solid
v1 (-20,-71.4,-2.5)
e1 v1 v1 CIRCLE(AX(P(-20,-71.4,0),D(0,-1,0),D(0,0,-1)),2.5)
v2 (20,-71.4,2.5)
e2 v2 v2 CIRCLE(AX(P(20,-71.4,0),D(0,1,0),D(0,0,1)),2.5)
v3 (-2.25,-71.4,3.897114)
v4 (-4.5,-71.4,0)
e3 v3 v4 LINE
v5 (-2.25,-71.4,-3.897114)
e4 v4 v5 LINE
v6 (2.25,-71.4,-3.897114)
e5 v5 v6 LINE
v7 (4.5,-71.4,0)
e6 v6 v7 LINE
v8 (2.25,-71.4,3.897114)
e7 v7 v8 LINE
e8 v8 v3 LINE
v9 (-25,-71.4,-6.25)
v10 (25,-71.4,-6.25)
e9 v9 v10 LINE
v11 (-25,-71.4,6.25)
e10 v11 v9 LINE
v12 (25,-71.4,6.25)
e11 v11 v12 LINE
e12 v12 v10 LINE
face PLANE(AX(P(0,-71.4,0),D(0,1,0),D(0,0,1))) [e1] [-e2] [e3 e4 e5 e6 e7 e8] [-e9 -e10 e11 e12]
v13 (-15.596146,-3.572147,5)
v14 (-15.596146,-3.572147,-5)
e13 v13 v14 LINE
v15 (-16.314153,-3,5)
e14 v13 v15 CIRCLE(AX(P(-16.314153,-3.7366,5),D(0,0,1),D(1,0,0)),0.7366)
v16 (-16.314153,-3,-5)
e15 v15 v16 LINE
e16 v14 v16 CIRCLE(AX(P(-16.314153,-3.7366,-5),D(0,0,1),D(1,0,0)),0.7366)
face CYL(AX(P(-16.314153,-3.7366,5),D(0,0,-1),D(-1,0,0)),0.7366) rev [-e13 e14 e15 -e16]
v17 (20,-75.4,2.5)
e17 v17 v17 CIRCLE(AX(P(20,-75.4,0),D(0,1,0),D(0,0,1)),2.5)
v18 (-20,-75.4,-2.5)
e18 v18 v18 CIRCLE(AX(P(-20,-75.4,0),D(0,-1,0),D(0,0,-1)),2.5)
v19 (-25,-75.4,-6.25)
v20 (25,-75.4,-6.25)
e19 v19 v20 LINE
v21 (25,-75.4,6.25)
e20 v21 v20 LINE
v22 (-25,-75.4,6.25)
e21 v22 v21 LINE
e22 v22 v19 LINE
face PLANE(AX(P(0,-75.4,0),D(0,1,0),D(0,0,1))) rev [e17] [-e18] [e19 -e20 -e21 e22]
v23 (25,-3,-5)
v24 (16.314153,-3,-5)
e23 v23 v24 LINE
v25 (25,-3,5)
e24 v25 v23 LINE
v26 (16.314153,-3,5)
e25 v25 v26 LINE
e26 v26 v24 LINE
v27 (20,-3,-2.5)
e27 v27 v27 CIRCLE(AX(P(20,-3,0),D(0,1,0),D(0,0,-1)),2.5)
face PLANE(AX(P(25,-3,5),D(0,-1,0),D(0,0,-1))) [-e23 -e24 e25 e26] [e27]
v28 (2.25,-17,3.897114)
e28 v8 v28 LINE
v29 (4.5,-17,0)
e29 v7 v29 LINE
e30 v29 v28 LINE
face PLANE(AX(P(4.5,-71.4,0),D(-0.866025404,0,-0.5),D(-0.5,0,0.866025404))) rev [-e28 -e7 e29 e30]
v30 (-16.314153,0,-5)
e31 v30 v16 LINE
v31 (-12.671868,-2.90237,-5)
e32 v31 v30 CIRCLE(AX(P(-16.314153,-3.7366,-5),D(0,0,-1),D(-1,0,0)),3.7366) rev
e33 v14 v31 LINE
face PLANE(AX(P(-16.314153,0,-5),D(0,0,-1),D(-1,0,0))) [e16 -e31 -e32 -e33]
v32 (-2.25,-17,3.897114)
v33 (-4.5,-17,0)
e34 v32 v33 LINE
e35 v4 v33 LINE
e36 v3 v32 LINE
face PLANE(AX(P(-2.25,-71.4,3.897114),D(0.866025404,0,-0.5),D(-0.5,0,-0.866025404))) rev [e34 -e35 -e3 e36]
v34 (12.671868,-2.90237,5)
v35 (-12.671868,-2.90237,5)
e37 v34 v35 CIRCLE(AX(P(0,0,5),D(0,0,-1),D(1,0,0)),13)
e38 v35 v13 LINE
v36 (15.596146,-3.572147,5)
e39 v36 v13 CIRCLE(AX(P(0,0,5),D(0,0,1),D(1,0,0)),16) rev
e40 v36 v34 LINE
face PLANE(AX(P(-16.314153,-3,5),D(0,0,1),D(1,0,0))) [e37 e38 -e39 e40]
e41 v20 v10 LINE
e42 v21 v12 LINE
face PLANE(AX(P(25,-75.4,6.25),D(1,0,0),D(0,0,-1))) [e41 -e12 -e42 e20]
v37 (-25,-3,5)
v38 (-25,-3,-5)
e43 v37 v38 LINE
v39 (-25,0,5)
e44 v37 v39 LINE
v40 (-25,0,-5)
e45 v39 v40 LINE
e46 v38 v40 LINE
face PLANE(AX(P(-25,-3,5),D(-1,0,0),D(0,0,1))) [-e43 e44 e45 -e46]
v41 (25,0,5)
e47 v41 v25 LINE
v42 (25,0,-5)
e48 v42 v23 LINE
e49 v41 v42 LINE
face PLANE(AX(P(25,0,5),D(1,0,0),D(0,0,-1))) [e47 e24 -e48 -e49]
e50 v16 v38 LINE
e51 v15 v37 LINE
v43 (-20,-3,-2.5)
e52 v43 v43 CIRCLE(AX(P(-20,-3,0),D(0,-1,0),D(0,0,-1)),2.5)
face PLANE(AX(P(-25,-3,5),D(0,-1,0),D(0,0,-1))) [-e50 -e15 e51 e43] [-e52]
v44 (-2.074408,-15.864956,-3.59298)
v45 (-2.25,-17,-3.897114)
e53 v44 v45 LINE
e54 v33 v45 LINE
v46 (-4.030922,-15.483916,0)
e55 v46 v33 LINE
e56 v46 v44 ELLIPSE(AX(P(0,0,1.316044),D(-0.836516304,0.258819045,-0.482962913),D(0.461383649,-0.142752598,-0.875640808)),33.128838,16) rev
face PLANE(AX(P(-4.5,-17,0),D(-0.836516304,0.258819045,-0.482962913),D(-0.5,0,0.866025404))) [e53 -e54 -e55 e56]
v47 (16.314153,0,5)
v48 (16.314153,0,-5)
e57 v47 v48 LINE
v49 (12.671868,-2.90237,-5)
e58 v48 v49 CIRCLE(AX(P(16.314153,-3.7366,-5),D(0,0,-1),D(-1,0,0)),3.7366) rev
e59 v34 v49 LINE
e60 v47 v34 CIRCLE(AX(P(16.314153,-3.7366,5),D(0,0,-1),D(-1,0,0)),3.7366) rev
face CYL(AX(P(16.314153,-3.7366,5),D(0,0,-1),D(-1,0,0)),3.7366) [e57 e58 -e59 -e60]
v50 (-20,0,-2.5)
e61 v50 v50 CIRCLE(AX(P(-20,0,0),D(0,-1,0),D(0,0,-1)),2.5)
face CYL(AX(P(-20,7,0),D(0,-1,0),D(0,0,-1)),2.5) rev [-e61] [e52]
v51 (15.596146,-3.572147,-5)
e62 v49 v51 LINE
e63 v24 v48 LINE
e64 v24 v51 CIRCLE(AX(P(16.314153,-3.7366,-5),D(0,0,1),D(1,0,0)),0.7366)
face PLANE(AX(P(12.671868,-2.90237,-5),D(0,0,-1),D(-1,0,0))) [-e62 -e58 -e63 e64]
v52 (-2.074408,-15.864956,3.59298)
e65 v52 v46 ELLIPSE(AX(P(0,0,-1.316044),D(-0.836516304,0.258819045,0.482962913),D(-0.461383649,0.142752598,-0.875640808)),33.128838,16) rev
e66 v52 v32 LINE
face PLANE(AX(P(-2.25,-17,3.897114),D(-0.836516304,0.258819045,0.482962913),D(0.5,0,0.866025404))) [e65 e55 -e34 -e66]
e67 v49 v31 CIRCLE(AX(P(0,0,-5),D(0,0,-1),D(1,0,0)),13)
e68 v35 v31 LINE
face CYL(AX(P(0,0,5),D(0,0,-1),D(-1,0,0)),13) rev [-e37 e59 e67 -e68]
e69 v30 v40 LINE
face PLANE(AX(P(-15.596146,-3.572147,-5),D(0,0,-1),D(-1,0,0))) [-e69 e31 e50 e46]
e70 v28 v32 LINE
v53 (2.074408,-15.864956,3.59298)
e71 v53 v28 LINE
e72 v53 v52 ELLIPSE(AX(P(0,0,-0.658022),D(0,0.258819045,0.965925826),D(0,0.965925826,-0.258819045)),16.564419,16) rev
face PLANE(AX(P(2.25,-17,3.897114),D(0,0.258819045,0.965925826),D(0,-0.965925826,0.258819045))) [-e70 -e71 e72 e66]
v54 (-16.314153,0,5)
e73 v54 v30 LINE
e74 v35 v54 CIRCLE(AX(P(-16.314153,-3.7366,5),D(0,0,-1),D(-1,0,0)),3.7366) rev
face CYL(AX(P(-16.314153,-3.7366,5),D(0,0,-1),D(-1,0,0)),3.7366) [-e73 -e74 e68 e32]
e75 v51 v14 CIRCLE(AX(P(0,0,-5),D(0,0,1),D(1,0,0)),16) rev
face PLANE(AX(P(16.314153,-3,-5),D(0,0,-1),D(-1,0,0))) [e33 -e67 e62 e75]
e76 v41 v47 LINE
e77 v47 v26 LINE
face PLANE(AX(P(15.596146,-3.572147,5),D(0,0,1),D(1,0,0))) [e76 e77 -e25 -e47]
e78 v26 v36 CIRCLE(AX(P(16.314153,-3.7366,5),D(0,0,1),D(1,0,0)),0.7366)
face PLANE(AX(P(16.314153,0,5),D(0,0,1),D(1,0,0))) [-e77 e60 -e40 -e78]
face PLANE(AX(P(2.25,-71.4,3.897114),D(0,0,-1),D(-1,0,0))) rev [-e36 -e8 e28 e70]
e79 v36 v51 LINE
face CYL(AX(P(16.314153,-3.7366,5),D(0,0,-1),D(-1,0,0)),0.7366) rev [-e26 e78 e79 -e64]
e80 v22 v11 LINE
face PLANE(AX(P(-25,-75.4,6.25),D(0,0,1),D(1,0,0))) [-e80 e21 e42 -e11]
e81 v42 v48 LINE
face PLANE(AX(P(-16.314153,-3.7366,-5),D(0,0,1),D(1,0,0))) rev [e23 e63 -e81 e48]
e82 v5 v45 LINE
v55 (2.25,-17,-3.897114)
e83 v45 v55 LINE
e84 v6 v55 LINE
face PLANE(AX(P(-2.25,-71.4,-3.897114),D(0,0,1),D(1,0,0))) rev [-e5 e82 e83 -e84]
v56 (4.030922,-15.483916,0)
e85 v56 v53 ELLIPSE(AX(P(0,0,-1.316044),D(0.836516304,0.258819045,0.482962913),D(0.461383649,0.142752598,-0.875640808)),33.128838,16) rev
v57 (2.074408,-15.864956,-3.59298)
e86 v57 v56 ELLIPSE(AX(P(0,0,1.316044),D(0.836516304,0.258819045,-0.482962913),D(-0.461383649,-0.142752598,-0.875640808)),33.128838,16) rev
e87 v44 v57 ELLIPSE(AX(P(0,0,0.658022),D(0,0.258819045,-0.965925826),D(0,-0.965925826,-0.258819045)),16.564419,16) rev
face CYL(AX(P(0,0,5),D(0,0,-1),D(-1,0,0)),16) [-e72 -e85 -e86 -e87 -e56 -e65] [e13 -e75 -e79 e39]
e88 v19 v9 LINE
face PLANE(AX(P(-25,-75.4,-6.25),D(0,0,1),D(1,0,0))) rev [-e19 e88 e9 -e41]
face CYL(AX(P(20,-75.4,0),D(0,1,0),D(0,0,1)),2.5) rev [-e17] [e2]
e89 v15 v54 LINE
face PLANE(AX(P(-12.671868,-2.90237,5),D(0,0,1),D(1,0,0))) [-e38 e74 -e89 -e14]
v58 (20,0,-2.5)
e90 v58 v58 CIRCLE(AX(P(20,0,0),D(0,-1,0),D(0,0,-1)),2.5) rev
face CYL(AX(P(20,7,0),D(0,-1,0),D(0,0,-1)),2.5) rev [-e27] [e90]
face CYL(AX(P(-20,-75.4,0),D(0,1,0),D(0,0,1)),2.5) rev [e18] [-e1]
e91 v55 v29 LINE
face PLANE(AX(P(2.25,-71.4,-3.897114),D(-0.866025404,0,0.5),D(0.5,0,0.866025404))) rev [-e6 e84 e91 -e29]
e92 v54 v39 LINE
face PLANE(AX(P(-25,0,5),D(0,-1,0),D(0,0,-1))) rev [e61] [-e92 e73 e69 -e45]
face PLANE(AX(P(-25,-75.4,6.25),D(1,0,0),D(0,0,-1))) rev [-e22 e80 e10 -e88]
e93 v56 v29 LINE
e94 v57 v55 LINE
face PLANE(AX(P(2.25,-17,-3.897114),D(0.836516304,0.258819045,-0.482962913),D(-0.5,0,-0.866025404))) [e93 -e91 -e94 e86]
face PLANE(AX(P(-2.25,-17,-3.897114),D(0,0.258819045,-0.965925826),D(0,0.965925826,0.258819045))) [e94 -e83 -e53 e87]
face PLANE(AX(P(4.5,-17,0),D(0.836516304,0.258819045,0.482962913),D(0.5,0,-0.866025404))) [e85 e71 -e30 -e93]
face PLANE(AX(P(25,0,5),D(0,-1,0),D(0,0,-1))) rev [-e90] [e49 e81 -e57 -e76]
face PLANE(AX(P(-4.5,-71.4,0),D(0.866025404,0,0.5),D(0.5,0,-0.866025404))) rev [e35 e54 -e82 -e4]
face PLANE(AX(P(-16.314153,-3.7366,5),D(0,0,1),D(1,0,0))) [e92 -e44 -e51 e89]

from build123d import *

# Parameters (mm, degrees)
BASE_FLANGE1_START  = -5
BASE_FLANGE1_DEPTH  = 10
SKETCH7_R           = 2.5
CUT_EXTRUDE2_DEPTH  = 10
BOSS_EXTRUDE1_START = 1
BOSS_EXTRUDE1_DEPTH = 2
BOSS_EXTRUDE1_DRAFT = -15
BOSS_EXTRUDE2_DEPTH = 54.4
BOSS_EXTRUDE3_START = 4
SKETCH10_W          = 50
SKETCH10_H          = 12.5
SKETCH10_R          = 2.5
BOSS_EXTRUDE3_DEPTH = 4


# Read off the part's stored shape, not the designer's step: Base-Flange1
with BuildPart() as part:
    # Base-Flange1 outline → Base-Flange1 (new body)
    with BuildSketch(Plane.XY.offset(BASE_FLANGE1_START)):
        with BuildLine():
            Line((-16.314153364, 0), (-25, 0))
            Line((-25, 0), (-25, -3))
            Line((-25, -3), (-16.314153364, -3))
            ThreePointArc((-16.314153364, -3), (-15.855108879, -3.160529066), (-15.596145802, -3.57214727))
            ThreePointArc((-15.596145802, -3.57214727), (0, -16), (15.596145802, -3.57214727))
            ThreePointArc((15.596145802, -3.57214727), (15.855108879, -3.160529066), (16.314153364, -3))
            Line((16.314153364, -3), (25, -3))
            Line((25, -3), (25, 0))
            Line((25, 0), (16.314153364, 0))
            ThreePointArc((16.314153364, 0), (13.985527754, -0.814326513), (12.671868464, -2.902369657))
            ThreePointArc((12.671868464, -2.902369657), (0, -13), (-12.671868464, -2.902369657))
            ThreePointArc((-12.671868464, -2.902369657), (-13.985527754, -0.814326513), (-16.314153364, 0))
        make_face()
    extrude(amount=BASE_FLANGE1_DEPTH)

    # Sketch7 → Cut-Extrude2 (cut)
    with BuildSketch(Plane.XZ.offset(3)):
        with Locations(Location((-20, 0, 0), (0, 0, 270))):
            Circle(SKETCH7_R)
    cut_extrude2 = extrude(amount=-CUT_EXTRUDE2_DEPTH, mode=Mode.SUBTRACT)

    # Mirror1: Cut-Extrude2 across plane
    add(cut_extrude2.mirror(Plane(origin=(0, 0, 0), x_dir=(0, 0, 1), z_dir=(1, 0, 0))), mode=Mode.SUBTRACT)


with BuildPart() as boss_extrude1_tool:
    # Sketch8 → Boss-Extrude1 (with draft: the straight prism first)
    with BuildSketch(Plane(origin=(0, -16, 0), x_dir=(-1, 0, 0), z_dir=(0, -1, 0)).offset(BOSS_EXTRUDE1_START)):
        Polygon((-2.25, -3.897114317), (2.25, -3.897114317), (4.5, 0), (2.25, 3.897114317), (-2.25, 3.897114317), (-4.5, 0), align=None)
    extrude(amount=-BOSS_EXTRUDE1_DEPTH)
    # Boss-Extrude1: the draft: its side faces are tilted about the plane it starts from
    boss_extrude1_sides = [boss_extrude1_tool.faces().sort_by_distance(p)[0] for p in [
        (0, -16, 3.897114317),
        (-3.375, -16, 1.948557159),
        (-3.375, -16, -1.948557159),
        (0, -16, -3.897114317),
        (3.375, -16, -1.948557159),
        (3.375, -16, 1.948557159),
    ]]
    draft(boss_extrude1_sides, Plane(origin=(0, -16, 0), x_dir=(-1, 0, 0), z_dir=(0, -1, 0)).offset(BOSS_EXTRUDE1_START), BOSS_EXTRUDE1_DRAFT)


with BuildPart() as part_1:
    add(part.part)

    # Boss-Extrude1: add boss_extrude1_tool
    add(boss_extrude1_tool.part)

    # Sketch9 → Boss-Extrude2 (add)
    with BuildSketch(Plane.XZ.offset(17)):
        Polygon((4.5, 0), (2.25, 3.897114317), (-2.25, 3.897114317), (-4.5, 0), (-2.25, -3.897114317), (2.25, -3.897114317), align=None)
    extrude(amount=BOSS_EXTRUDE2_DEPTH)

    # Sketch10 → Boss-Extrude3 (add)
    with BuildSketch(Plane.XZ.offset(71.4).offset(BOSS_EXTRUDE3_START)):
        Rectangle(SKETCH10_W, SKETCH10_H)
        with Locations(Location((-20, 0, 0), (0, 0, 270))):
            Circle(SKETCH10_R, mode=Mode.SUBTRACT)
        with Locations(Location((20, 0, 0), (0, 0, 270))):
            Circle(SKETCH10_R, mode=Mode.SUBTRACT)
    extrude(amount=-BOSS_EXTRUDE3_DEPTH)


solid = part_1.part
